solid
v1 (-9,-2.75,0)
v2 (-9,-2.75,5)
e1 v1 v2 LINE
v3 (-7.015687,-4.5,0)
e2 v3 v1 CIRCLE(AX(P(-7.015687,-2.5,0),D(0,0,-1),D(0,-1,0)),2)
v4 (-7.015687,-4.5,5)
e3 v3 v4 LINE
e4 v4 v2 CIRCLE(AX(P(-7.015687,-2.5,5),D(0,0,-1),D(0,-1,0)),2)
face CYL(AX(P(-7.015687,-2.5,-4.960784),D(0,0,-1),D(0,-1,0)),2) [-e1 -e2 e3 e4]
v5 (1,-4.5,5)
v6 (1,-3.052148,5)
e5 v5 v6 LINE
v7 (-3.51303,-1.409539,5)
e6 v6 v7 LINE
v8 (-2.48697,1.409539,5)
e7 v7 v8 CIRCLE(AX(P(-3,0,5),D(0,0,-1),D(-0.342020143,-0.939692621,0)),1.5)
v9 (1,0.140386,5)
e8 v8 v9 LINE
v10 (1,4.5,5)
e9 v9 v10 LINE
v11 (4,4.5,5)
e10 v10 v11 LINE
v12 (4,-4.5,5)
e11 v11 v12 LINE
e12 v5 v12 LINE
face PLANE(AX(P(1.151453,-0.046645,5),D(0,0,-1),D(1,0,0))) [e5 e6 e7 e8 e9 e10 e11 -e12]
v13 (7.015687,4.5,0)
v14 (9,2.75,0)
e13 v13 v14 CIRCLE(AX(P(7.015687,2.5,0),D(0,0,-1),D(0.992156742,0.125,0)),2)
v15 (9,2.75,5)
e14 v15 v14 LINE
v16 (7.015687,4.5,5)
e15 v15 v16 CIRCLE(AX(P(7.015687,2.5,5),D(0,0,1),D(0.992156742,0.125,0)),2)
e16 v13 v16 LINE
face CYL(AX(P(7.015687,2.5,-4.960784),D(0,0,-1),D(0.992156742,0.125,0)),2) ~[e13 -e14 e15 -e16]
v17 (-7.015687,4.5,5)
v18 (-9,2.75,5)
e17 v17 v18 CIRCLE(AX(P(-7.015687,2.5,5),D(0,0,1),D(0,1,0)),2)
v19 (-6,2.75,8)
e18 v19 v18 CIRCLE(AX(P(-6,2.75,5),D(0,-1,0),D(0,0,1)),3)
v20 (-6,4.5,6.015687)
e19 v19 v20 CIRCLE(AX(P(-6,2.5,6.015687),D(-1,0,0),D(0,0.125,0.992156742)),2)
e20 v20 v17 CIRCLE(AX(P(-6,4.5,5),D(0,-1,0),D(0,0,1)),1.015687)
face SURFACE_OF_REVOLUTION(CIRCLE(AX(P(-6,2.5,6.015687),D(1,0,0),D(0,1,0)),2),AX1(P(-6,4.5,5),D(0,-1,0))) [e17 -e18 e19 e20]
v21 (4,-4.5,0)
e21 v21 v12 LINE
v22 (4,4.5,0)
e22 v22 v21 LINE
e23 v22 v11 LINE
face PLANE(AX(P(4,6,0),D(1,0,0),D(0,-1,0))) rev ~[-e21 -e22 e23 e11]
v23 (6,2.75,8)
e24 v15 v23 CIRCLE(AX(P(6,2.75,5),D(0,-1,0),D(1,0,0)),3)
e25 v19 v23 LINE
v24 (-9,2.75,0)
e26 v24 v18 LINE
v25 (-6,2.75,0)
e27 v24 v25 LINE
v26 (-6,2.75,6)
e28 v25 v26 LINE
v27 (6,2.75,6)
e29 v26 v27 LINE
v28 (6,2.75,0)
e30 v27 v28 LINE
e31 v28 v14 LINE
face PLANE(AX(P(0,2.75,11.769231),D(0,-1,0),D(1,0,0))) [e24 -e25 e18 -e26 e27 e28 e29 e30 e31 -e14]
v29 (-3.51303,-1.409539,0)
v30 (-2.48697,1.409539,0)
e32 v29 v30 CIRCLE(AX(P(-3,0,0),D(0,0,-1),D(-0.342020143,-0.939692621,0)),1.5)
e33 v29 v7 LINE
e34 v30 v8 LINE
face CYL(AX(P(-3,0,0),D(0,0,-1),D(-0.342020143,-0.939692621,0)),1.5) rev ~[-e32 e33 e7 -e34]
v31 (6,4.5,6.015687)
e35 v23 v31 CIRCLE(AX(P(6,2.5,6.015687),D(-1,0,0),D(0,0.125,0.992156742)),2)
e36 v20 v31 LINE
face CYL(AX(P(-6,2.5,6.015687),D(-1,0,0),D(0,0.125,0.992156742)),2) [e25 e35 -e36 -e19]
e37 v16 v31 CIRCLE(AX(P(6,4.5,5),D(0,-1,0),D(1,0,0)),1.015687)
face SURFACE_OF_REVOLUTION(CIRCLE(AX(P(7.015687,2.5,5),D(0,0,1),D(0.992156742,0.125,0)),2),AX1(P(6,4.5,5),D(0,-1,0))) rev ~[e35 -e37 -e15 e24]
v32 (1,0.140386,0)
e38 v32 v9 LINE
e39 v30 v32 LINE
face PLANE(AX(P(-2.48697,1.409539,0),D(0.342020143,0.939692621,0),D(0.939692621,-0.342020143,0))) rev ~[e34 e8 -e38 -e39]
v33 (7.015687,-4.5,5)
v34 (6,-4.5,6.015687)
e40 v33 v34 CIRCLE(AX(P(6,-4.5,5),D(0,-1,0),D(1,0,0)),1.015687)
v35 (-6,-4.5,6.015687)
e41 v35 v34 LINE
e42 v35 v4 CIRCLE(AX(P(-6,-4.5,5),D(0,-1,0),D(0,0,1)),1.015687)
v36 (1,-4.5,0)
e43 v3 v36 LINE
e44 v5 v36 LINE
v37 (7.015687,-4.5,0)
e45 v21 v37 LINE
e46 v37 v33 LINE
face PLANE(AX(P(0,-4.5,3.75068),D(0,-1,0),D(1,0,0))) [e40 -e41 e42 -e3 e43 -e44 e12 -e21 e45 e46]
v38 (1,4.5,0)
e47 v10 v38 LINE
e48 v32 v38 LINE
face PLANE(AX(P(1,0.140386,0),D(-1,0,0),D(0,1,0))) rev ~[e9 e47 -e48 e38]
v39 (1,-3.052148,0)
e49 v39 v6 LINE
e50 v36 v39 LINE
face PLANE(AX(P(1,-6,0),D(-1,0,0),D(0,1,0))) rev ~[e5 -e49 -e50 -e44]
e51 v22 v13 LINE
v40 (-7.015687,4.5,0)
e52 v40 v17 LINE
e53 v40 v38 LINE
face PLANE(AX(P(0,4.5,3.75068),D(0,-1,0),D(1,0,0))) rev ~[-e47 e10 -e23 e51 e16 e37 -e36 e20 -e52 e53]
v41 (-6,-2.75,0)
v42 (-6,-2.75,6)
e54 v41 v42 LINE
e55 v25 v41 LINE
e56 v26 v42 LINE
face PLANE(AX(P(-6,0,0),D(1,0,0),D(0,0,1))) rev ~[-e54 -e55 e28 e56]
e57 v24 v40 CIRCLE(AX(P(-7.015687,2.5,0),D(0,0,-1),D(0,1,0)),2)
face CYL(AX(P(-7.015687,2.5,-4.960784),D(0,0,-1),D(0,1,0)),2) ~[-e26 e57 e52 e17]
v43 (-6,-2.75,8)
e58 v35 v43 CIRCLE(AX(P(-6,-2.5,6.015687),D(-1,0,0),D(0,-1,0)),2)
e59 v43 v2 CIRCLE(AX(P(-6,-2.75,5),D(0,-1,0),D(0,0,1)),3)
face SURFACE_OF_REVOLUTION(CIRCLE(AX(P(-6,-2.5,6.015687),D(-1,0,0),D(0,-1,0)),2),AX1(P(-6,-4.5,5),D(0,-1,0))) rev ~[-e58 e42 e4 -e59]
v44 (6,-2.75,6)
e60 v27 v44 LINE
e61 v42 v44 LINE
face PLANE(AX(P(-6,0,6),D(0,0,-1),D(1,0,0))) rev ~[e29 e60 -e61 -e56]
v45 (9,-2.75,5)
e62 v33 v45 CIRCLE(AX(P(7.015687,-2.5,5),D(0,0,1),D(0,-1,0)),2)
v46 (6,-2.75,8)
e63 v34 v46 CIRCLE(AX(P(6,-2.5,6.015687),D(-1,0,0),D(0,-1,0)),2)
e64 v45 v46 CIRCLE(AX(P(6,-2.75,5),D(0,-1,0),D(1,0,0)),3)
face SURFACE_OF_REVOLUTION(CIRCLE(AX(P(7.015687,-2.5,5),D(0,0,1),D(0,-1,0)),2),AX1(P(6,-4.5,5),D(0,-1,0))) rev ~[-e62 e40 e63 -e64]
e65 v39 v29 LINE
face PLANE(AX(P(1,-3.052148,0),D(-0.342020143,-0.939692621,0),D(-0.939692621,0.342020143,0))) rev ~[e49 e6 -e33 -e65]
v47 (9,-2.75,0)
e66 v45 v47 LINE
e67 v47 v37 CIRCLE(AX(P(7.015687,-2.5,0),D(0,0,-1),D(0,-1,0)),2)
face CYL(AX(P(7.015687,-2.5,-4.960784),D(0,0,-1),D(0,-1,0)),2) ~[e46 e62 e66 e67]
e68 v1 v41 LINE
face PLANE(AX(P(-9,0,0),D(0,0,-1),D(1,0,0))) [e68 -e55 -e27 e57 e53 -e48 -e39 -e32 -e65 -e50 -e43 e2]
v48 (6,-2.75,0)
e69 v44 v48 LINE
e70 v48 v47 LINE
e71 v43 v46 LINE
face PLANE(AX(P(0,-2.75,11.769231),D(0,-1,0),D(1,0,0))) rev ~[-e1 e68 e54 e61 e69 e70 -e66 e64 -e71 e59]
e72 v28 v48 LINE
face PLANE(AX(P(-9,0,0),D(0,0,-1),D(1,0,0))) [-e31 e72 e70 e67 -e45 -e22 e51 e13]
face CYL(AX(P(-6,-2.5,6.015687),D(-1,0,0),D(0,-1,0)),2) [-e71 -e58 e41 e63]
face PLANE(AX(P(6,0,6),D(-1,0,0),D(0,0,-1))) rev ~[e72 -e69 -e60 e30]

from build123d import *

# Parameters (mm, degrees)
F1_DEPTH     = 4.5
F3_DEPTH     = 2.75
F5_DEPTH     = 5
F6_T1_DEPTH  = 9.9607837082
F6_T3_DEPTH  = 12
F6_T6_ANGLE  = 90
F6_T8_ANGLE  = 90
F6_T10_ANGLE = 90
F6_T12_ANGLE = 90


# Not quite as in the source:
# - a fillet or chamfer that OpenCascade refuses, or shapes differently, is made with other operations: its cross-section is extruded or revolved along the edge and cut away or added


with BuildPart() as f1:
    # F0 (on Front) → F1 (new body, symmetric)
    with BuildSketch(Plane.XZ):
        with BuildLine():
            Line((6, 8), (-6, 8))
            ThreePointArc((-6, 8), (-8.1213203436, 7.1213203436), (-9, 5))
            Line((-9, 5), (-9, 0))
            Line((-9, 0), (9, 0))
            Line((9, 0), (9, 5))
            ThreePointArc((9, 5), (8.1213203436, 7.1213203436), (6, 8))
        make_face()
    extrude(amount=F1_DEPTH, both=True)

    # F2 (on Front) → F3 (cut, symmetric)
    with BuildSketch(Plane.XZ):
        Polygon((-24, 24), (-24, 0), (-6, 0), (-6, 6), (6, 6), (6, 0), (24, 0), (24, 24), align=None)
    extrude(amount=F3_DEPTH, both=True, mode=Mode.SUBTRACT)

    # F4 (on face) → F5 (cut)
    with BuildSketch(Plane(origin=(0, 0, 0), x_dir=(1, 0, 0), z_dir=(0, 0, -1))):
        with BuildLine():
            Line((4, -6), (4, 6))
            Line((4, 6), (1, 6))
            Line((1, 6), (1, 3.0521475958))
            Line((1, 3.0521475958), (-3.513030215, 1.4095389312))
            ThreePointArc((-3.513030215, 1.4095389312), (-4.4095389312, -0.513030215), (-2.486969785, -1.4095389312))
            Line((-2.486969785, -1.4095389312), (1, -0.1403857216))
            Line((1, -0.1403857216), (1, -6))
            Line((1, -6), (4, -6))
        make_face()
    extrude(amount=-F5_DEPTH, mode=Mode.SUBTRACT)

    # F6: fillet of radius 2 on 2 edges, made by hand

    # F6_s2 → F6_t1 (cut)
    with BuildSketch(Plane.XY.offset(-4.9607837082)):
        with BuildLine():
            ThreePointArc((9, 2.75), (8.3385621722, 4), (7.0156865167, 4.5))
            Line((7.0156865167, 4.5), (9, 4.5))
            Line((9, 4.5), (9, 2.75))
        make_face()
        with BuildLine():
            ThreePointArc((-7.0156865167, 4.5), (-8.3385621722, 4), (-9, 2.75))
            Line((-9, 2.75), (-9, 4.5))
            Line((-9, 4.5), (-7.0156865167, 4.5))
        make_face()
        with BuildLine():
            ThreePointArc((-7.0156865167, -4.5), (-8.3385621722, -4), (-9, -2.75))
            Line((-9, -2.75), (-9, -4.5))
            Line((-9, -4.5), (-7.0156865167, -4.5))
        make_face()
        with BuildLine():
            ThreePointArc((7.0156865167, -4.5), (8.3385621722, -4), (9, -2.75))
            Line((9, -2.75), (9, -4.5))
            Line((9, -4.5), (7.0156865167, -4.5))
        make_face()
    extrude(amount=F6_T1_DEPTH, mode=Mode.SUBTRACT)

    # F6_s4 → F6_t3 (cut)
    with BuildSketch(Plane.YZ.offset(-6)):
        with BuildLine():
            ThreePointArc((2.75, 8), (4, 7.3385621722), (4.5, 6.0156865167))
            Line((4.5, 6.0156865167), (4.5, 8))
            Line((4.5, 8), (2.75, 8))
        make_face()
        with BuildLine():
            ThreePointArc((-4.5, 6.0156865167), (-4, 7.3385621722), (-2.75, 8))
            Line((-2.75, 8), (-4.5, 8))
            Line((-4.5, 8), (-4.5, 6.0156865167))
        make_face()
    extrude(amount=F6_T3_DEPTH, mode=Mode.SUBTRACT)

    # F6_s5 → F6_t6 (revolve, cut)
    with BuildSketch(Plane.YZ.offset(-6)):
        with BuildLine():
            ThreePointArc((-4.5, 6.0156865167), (-4, 7.3385621722), (-2.75, 8))
            Line((-2.75, 8), (-4.5, 8))
            Line((-4.5, 8), (-4.5, 6.0156865167))
        make_face()
    revolve(axis=Axis((-6, -4.5, 5), (0, -1, 0)), revolution_arc=F6_T6_ANGLE, mode=Mode.SUBTRACT)

    # F6_s7 → F6_t8 (revolve, cut)
    with BuildSketch(Plane.XY.offset(5)):
        with BuildLine():
            ThreePointArc((9, 2.75), (8.3385621722, 4), (7.0156865167, 4.5))
            Line((7.0156865167, 4.5), (9, 4.5))
            Line((9, 4.5), (9, 2.75))
        make_face()
    revolve(axis=Axis((6, 4.5, 5), (0, -1, 0)), revolution_arc=F6_T8_ANGLE, mode=Mode.SUBTRACT)

    # F6_s9 → F6_t10 (revolve, cut)
    with BuildSketch(Plane.YZ.offset(-6)):
        with BuildLine():
            ThreePointArc((4.5, 6.0156865167), (4, 7.3385621722), (2.75, 8))
            Line((2.75, 8), (4.5, 8))
            Line((4.5, 8), (4.5, 6.0156865167))
        make_face()
    revolve(axis=Axis((-6, 4.5, 5), (0, -1, 0)), revolution_arc=F6_T10_ANGLE, mode=Mode.SUBTRACT)

    # F6_s11 → F6_t12 (revolve, cut)
    with BuildSketch(Plane.XY.offset(5)):
        with BuildLine():
            ThreePointArc((7.0156865167, -4.5), (8.3385621722, -4), (9, -2.75))
            Line((9, -2.75), (9, -4.5))
            Line((9, -4.5), (7.0156865167, -4.5))
        make_face()
    revolve(axis=Axis((6, -4.5, 5), (0, -1, 0)), revolution_arc=F6_T12_ANGLE, mode=Mode.SUBTRACT)


solid = f1.part
